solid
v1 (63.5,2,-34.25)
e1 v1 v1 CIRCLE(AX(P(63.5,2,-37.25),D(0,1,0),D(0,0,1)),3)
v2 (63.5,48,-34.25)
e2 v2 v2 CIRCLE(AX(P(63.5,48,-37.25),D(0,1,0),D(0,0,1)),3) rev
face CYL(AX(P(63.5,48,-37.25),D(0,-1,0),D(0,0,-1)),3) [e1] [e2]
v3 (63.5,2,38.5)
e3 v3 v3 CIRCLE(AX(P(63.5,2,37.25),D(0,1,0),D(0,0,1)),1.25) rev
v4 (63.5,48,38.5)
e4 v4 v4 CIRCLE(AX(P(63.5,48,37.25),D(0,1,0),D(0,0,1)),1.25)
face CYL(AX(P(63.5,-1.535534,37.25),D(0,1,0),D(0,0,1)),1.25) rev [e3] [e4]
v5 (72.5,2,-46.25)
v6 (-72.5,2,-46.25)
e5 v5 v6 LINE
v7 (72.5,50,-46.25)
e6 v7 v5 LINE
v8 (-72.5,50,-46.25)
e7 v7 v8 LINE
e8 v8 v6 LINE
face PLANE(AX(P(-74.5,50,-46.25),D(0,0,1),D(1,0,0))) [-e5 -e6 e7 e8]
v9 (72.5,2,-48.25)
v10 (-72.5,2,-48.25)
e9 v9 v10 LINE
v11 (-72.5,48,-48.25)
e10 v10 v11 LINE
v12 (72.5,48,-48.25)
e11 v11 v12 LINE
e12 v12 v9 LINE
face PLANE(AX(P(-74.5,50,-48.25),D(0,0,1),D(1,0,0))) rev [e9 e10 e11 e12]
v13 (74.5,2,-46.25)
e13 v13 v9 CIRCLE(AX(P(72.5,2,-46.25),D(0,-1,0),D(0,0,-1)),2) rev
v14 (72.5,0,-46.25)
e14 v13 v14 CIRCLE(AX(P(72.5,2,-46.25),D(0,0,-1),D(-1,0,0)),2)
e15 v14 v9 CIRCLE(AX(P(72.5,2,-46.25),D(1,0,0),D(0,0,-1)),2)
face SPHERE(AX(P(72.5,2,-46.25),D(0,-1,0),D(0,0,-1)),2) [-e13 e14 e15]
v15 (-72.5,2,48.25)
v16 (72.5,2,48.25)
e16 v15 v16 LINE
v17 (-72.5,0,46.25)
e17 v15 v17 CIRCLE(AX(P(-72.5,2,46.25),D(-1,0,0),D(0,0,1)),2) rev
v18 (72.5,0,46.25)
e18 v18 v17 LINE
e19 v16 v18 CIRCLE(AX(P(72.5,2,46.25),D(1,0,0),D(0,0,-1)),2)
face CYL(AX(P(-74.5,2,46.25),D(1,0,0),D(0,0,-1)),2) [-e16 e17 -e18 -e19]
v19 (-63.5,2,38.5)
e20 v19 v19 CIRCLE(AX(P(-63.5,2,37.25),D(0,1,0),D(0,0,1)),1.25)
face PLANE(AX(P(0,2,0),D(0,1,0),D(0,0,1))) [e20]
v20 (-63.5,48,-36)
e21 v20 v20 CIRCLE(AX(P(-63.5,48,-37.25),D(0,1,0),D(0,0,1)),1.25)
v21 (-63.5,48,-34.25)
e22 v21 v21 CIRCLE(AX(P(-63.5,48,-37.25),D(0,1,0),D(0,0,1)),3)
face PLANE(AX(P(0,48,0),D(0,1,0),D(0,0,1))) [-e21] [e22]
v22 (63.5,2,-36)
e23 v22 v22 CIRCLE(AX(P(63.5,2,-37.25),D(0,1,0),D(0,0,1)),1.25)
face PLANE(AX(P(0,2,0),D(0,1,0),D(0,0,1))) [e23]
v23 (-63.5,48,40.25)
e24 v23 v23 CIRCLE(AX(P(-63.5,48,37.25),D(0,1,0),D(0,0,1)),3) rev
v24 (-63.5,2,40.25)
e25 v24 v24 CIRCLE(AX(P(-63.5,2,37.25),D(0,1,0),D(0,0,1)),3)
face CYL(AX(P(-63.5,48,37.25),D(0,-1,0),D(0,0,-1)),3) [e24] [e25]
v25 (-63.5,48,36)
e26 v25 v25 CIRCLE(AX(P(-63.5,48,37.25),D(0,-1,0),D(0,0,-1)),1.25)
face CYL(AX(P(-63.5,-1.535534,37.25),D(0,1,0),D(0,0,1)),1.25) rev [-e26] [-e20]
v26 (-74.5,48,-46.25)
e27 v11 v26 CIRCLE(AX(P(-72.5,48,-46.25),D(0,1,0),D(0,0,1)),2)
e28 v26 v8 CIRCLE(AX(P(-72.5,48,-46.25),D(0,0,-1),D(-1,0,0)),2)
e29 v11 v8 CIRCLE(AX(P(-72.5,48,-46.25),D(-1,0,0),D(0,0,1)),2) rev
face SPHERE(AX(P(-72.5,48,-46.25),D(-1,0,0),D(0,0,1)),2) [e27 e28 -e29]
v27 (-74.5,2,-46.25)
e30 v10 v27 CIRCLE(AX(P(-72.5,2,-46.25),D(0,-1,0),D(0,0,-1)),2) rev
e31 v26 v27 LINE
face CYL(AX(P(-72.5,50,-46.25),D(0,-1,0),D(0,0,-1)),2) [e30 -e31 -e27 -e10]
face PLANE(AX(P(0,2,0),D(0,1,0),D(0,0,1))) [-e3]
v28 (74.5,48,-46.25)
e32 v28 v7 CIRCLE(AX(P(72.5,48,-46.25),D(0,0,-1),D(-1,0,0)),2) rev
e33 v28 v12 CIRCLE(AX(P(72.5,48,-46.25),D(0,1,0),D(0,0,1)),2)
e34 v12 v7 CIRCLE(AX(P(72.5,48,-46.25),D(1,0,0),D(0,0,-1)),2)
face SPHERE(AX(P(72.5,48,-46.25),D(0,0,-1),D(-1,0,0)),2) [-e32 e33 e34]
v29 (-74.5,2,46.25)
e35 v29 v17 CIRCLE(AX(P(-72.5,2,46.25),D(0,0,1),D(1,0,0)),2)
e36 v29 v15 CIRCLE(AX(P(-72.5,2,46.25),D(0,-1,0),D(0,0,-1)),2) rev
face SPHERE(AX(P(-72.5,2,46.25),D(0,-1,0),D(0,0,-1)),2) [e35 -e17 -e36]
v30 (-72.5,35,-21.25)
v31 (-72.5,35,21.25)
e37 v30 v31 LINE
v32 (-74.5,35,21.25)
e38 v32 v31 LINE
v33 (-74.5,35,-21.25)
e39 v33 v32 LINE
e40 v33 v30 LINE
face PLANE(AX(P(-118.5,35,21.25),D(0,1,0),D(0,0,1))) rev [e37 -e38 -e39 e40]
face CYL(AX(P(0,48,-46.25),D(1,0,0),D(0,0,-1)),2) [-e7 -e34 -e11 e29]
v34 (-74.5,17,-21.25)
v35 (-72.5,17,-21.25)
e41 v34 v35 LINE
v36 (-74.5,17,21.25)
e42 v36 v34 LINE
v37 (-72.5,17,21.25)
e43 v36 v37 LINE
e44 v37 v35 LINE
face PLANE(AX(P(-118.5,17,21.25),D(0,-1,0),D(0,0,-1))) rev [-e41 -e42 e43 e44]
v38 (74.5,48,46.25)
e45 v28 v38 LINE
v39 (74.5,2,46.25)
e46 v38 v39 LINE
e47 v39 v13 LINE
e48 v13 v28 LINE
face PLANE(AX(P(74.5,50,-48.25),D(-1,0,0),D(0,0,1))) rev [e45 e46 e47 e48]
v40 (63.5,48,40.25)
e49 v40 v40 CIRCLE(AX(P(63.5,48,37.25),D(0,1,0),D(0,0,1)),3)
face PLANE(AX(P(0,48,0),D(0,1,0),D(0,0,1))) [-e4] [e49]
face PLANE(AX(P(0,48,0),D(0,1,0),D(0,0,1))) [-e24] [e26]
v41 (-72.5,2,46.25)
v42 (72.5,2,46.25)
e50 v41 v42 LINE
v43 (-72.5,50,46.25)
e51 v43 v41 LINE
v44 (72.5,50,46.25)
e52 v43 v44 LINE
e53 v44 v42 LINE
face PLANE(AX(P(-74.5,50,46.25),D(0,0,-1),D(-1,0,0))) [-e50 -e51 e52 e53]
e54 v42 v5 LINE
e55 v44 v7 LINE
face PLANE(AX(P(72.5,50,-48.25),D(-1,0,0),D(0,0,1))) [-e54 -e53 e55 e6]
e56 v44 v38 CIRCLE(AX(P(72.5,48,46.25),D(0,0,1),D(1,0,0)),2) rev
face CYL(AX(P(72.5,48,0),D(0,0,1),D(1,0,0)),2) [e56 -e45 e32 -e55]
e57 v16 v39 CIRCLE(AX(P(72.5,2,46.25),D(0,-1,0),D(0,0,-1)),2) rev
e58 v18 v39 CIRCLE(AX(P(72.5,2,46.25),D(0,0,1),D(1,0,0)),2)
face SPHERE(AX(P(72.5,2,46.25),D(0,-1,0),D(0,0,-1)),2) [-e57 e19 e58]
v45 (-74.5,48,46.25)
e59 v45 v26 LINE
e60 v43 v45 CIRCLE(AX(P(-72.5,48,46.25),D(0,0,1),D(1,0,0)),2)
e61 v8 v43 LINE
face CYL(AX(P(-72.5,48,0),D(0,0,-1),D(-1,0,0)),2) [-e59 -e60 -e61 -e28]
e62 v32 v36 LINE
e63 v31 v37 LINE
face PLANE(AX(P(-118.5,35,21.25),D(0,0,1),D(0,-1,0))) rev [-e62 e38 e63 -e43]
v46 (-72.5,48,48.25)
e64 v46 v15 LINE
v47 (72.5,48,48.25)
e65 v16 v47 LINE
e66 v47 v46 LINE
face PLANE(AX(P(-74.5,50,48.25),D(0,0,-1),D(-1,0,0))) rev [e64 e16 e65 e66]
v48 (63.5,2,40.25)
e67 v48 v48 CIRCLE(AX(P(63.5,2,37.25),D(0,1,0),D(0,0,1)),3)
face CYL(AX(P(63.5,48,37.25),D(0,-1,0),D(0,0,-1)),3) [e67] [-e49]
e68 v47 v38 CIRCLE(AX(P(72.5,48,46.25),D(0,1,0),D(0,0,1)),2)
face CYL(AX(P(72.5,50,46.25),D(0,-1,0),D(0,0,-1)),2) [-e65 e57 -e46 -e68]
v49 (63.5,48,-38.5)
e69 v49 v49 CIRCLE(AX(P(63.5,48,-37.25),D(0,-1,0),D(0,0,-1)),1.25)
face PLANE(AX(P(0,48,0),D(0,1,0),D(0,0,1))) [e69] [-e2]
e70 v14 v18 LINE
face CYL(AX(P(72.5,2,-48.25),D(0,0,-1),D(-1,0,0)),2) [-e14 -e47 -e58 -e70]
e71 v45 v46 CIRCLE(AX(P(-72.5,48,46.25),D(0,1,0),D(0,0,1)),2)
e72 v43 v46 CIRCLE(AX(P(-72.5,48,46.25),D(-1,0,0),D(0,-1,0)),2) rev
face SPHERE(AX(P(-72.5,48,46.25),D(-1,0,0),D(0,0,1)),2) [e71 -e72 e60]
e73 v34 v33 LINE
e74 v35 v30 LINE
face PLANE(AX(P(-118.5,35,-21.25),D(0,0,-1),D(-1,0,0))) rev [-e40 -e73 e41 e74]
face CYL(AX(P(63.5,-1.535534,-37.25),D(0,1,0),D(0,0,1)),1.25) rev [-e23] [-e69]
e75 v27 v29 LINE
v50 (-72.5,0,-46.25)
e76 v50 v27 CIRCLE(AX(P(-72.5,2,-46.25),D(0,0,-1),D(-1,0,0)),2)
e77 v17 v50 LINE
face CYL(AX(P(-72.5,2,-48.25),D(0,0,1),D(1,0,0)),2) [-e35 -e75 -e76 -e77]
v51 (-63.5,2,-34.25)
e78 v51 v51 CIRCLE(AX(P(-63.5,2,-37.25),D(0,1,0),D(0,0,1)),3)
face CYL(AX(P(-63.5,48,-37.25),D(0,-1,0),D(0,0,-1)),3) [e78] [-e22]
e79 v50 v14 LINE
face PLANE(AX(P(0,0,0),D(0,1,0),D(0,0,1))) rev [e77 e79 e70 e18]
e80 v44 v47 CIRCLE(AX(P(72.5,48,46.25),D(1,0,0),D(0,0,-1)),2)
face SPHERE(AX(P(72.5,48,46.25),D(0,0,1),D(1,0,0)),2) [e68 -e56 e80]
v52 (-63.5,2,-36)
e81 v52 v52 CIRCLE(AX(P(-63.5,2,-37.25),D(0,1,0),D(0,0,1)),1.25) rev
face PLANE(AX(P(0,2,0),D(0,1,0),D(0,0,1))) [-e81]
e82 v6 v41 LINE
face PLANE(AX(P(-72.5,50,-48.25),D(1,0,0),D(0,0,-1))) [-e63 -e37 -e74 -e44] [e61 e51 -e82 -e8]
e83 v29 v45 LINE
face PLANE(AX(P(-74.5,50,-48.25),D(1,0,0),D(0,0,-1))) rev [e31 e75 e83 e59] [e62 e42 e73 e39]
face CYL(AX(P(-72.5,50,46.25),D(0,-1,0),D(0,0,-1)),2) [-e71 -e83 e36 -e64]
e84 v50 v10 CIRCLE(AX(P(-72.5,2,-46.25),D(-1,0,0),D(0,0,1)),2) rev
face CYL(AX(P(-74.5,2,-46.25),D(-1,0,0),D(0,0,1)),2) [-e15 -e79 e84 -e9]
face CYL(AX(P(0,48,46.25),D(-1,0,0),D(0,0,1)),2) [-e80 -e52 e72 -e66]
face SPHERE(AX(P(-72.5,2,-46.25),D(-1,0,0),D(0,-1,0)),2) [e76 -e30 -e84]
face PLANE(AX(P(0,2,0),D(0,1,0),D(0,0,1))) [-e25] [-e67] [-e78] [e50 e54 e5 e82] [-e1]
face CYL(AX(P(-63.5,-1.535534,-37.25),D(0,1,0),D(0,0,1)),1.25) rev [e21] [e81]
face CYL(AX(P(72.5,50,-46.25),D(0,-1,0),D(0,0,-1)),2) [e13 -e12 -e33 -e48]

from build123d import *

# Parameters (mm, degrees)
SKETCH1_W           = 149
SKETCH1_H           = 96.5
BOSS_EXTRUDE1_DEPTH = 50
SHELL2_T            = -2
SKETCH2_R           = 3
BOSS_EXTRUDE2_DEPTH = 46
SKETCH3_W           = 42.5
SKETCH3_H           = 18
CUT_EXTRUDE1_DEPTH  = 46
SKETCH4_R           = 1.25
CUT_EXTRUDE2_DEPTH  = 46
FILLET1_R           = 2


with BuildPart() as part:
    # Sketch1 → Boss-Extrude1 (new body)
    with BuildSketch(Plane(origin=(0, 0, 0), x_dir=(1, 0, 0), z_dir=(0, 1, 0))):
        Rectangle(SKETCH1_W, SKETCH1_H)
    extrude(amount=BOSS_EXTRUDE1_DEPTH)

    # Shell2
    shell2_openings = [part.faces().sort_by_distance(p)[0] for p in [
        (0, 50, 0),
    ]]
    offset(amount=SHELL2_T, openings=shell2_openings, kind=Kind.INTERSECTION)

    # Sketch2 → Boss-Extrude2 (add)
    with BuildSketch(Plane(origin=(0, 2, 0), x_dir=(1, 0, 0), z_dir=(0, 1, 0))):
        with Locations(Location((-63.5, 37.25, 0), (0, 0, 270))):
            Circle(SKETCH2_R)
        with Locations(Location((63.5, 37.25, 0), (0, 0, 270))):
            Circle(SKETCH2_R)
        with Locations(Location((63.5, -37.25, 0), (0, 0, 270))):
            Circle(SKETCH2_R)
        with Locations(Location((-63.5, -37.25, 0), (0, 0, 270))):
            Circle(SKETCH2_R)
    extrude(amount=BOSS_EXTRUDE2_DEPTH)

    # Sketch3 → Cut-Extrude1 (cut)
    with BuildSketch(Plane(origin=(-72.5, 0, 0), x_dir=(0, 0, -1), z_dir=(1, 0, 0))):
        with Locations((0, 26)):
            Rectangle(SKETCH3_W, SKETCH3_H)
    extrude(amount=-CUT_EXTRUDE1_DEPTH, mode=Mode.SUBTRACT)

    # Sketch4 → Cut-Extrude2 (cut)
    with BuildSketch(Plane(origin=(0, 48, 0), x_dir=(1, 0, 0), z_dir=(0, 1, 0))):
        with Locations(Location((63.5, -37.25, 0), (0, 0, 270))):
            Circle(SKETCH4_R)
        with Locations(Location((-63.5, 37.25, 0), (0, 0, 270))):
            Circle(SKETCH4_R)
        with Locations(Location((-63.5, -37.25, 0), (0, 0, 270))):
            Circle(SKETCH4_R)
        with Locations(Location((63.5, 37.25, 0), (0, 0, 270))):
            Circle(SKETCH4_R)
    extrude(amount=-CUT_EXTRUDE2_DEPTH, mode=Mode.SUBTRACT)

    # Fillet1
    fillet1_edges = [part.edges().sort_by_distance(p)[0] for p in [
        (-74.5, 50, 0),
        (0, 50, 48.25),
        (74.5, 50, 0),
        (0, 0, 48.25),
        (-74.5, 0, 0),
        (0, 0, -48.25),
        (74.5, 0, 0),
        (74.5, 25, 48.25),
        (-74.5, 25, 48.25),
        (-74.5, 25, -48.25),
        (74.5, 25, -48.25),
        (0, 50, -48.25),
    ]]
    fillet(fillet1_edges, radius=FILLET1_R - 0.0001)  # a hair under: the kernel refuses the full size


solid = part.part
